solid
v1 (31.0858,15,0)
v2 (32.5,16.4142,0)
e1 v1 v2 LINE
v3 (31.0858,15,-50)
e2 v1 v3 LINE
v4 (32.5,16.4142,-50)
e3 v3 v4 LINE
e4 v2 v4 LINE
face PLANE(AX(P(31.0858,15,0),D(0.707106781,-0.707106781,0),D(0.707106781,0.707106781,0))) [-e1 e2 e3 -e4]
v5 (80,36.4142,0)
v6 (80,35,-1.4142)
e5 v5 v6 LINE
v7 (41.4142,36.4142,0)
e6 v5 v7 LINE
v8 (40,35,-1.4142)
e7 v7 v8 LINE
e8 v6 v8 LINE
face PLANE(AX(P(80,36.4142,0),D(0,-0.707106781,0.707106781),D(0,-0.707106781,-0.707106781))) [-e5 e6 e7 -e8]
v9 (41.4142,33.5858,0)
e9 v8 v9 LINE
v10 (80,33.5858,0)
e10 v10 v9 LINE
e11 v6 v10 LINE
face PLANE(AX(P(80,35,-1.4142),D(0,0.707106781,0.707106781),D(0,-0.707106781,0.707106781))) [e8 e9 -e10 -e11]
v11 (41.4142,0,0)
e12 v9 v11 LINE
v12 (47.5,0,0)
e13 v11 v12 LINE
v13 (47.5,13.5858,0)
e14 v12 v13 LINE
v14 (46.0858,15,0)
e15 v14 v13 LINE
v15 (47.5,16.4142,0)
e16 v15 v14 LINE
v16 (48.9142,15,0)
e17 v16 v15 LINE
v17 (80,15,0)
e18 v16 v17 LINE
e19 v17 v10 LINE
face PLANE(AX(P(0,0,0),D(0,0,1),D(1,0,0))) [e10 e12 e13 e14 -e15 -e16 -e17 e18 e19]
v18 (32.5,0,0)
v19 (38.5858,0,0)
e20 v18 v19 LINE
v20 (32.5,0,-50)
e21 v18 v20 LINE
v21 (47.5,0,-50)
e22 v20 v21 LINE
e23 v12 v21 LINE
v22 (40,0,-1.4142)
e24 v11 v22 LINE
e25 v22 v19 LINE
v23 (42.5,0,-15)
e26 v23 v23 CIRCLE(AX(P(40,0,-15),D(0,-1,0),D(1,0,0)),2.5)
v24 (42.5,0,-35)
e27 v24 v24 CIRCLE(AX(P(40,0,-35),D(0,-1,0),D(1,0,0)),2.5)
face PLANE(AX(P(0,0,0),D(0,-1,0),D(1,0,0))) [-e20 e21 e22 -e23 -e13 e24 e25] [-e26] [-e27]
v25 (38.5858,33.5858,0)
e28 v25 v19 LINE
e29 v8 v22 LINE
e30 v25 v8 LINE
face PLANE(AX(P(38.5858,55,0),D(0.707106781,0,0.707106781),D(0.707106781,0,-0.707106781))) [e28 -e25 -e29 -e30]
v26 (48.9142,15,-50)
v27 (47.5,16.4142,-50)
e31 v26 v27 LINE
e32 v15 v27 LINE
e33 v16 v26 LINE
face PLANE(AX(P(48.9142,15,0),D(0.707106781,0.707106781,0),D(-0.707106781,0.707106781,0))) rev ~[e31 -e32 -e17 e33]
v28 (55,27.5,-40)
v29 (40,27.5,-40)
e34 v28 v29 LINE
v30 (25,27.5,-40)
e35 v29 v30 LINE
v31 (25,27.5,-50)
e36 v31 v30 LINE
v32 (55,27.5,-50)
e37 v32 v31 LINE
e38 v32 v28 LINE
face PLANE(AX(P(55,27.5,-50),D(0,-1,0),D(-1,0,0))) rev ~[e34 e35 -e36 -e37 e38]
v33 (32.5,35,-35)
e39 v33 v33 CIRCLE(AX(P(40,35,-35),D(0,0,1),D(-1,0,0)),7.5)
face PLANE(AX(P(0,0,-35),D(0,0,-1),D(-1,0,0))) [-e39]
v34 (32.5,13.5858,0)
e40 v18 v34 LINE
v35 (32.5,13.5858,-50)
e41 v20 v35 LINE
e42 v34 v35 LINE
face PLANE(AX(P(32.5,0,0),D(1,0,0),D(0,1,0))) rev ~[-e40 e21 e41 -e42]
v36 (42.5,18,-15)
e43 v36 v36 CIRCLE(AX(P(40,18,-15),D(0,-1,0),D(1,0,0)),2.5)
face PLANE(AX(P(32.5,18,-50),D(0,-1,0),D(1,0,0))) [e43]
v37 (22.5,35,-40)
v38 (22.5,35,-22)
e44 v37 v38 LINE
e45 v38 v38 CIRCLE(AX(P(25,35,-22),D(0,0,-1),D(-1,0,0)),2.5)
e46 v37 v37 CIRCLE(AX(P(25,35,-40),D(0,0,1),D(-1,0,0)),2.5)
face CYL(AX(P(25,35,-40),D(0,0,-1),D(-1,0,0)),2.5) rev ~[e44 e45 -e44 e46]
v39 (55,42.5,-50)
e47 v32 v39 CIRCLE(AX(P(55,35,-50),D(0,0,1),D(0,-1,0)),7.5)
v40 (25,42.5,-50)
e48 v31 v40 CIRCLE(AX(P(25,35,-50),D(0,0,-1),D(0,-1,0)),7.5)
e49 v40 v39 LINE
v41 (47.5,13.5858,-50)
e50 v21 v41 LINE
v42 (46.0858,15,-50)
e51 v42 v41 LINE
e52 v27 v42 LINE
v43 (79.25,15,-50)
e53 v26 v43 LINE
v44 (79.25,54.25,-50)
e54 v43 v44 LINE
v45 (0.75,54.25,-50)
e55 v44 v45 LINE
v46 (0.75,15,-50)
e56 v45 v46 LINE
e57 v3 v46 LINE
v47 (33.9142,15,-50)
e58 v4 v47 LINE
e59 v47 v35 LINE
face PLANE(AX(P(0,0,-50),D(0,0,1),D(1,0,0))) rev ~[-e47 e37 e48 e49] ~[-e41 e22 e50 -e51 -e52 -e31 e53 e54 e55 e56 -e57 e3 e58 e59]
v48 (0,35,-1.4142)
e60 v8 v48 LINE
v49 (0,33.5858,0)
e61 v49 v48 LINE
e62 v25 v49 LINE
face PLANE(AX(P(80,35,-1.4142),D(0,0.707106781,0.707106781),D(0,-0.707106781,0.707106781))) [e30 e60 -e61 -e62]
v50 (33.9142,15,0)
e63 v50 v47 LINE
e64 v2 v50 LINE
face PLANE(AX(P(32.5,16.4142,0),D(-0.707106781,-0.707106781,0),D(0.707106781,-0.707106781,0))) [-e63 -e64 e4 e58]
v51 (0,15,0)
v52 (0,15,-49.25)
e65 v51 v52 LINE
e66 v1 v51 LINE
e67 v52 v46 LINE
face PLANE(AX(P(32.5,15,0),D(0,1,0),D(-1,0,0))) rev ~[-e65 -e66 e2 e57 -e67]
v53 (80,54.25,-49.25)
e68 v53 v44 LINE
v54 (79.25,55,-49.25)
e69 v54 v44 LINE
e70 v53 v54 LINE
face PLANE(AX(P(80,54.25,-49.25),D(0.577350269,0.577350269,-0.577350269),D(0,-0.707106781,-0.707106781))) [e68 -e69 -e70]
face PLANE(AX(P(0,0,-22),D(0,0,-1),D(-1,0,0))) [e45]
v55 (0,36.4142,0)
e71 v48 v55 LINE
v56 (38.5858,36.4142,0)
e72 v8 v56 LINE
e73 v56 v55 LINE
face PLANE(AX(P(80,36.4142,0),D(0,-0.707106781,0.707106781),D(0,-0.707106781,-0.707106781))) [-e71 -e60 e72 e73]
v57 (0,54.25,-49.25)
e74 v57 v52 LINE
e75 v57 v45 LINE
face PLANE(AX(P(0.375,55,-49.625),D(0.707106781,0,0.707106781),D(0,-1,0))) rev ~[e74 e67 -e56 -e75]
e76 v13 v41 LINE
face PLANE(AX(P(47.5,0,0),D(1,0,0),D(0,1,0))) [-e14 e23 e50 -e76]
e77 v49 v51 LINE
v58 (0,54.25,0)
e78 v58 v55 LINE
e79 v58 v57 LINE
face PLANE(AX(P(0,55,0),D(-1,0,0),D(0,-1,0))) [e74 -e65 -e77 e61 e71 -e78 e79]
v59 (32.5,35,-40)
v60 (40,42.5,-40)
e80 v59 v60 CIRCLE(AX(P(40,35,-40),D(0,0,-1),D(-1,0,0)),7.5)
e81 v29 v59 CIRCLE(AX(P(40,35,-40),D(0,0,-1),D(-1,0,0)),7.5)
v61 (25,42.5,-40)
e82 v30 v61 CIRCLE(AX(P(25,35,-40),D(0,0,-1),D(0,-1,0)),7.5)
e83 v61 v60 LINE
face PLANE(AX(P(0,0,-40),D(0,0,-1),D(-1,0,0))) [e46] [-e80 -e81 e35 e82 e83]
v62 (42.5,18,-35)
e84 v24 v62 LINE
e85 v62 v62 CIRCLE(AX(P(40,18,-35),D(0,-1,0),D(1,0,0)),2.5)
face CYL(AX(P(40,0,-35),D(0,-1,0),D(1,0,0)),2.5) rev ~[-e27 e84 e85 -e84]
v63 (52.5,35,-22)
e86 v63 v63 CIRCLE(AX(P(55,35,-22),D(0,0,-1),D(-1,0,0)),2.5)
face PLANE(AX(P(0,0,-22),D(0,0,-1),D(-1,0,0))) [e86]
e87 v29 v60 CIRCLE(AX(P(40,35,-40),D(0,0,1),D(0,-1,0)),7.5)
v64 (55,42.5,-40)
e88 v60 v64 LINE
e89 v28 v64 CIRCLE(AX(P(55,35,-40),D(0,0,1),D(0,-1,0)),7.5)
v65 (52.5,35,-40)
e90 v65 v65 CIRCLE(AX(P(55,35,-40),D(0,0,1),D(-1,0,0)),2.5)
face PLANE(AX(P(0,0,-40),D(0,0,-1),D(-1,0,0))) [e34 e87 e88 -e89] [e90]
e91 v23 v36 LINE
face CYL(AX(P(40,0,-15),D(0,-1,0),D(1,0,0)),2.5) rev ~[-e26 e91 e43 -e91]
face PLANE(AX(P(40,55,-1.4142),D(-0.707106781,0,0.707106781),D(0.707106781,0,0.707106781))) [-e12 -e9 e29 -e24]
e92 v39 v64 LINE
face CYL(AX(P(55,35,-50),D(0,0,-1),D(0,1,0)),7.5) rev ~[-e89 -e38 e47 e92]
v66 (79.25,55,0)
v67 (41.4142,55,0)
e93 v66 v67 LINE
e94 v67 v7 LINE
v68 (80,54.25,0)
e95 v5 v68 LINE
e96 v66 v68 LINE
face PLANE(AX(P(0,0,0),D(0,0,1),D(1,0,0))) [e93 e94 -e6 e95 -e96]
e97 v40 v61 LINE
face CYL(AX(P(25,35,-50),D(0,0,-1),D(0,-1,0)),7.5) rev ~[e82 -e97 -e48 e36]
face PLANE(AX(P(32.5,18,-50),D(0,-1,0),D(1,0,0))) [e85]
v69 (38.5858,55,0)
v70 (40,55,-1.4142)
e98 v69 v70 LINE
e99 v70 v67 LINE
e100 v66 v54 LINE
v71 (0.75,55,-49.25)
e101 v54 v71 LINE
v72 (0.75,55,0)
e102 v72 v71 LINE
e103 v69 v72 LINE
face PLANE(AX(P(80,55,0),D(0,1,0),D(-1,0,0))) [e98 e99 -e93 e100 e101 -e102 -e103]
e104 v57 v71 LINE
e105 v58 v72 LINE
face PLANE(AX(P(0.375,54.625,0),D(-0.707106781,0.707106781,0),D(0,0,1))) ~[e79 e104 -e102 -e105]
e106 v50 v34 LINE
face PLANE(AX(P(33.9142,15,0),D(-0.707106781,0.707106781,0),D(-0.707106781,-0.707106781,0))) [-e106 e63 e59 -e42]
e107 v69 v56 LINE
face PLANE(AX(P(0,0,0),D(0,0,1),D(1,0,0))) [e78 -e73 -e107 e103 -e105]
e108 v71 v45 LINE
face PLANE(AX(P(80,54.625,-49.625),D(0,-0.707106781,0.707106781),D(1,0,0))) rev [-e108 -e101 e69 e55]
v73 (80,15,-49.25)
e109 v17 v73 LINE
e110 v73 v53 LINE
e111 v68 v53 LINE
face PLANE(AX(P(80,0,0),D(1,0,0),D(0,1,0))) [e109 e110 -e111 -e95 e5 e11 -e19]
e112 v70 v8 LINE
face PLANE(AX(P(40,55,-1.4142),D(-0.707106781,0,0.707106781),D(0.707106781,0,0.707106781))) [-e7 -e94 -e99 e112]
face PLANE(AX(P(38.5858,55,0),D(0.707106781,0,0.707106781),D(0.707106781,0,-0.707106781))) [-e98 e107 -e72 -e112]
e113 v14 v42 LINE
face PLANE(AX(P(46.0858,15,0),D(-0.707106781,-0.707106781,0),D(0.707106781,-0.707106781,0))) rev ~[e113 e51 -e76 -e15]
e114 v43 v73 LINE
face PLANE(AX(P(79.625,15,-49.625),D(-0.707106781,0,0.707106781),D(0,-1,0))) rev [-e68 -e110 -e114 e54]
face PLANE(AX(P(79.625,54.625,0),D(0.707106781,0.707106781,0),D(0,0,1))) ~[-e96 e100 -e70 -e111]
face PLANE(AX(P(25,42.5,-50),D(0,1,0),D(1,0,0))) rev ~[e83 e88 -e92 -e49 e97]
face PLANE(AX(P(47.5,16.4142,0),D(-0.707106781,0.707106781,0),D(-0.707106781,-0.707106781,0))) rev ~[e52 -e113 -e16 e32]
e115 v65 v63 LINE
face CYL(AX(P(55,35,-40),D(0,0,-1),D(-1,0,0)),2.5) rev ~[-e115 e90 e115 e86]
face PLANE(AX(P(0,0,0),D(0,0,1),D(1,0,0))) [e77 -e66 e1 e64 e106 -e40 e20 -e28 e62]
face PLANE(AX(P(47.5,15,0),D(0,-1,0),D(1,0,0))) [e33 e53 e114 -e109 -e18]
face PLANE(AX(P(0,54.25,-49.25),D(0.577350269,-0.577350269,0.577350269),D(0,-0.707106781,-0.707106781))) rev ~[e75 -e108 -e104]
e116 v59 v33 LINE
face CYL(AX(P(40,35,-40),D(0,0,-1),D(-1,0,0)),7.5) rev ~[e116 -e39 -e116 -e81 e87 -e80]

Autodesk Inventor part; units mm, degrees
ref_plane "YZ Plane" through (0, 0, 0) normal (1, 0, 0) x (0, 1, 0)
ref_plane "XZ Plane" through (0, 0, 0) normal (0, 1, 0) x (-1, 0, 0)
ref_plane "XY Plane" through (0, 0, 0) normal (0, 0, 1) x (1, 0, 0)
sketch "Sketch1" plane through (0, 0, 0) normal (0, 0, 1) x (1, 0, 0)
  line L0 (0, 0) -> (80, 0)
  line L1 (80, 0) -> (80, 55)
  line L2 (80, 55) -> (0, 55)
  line L3 (0, 55) -> (0, 0)
  dimension "d0" = 55
  dimension "d1" = 80
extrude "Extrusion1" add sketch "Sketch1" against normal blind 50
sketch "Sketch2" plane through (0, 0, 0) normal (0, 0, 1) x (1, 0, 0)
  line L0 (0, 0) -> (32.5, 0)
  line L1 (32.5, 0) -> (32.5, 15)
  line L2 (32.5, 15) -> (0, 15)
  line L3 (0, 15) -> (0, 0)
  line L4 (80, 55) -> (80, 0) projected
  line L5 (80, 0) -> (47.5, 0)
  line L6 (47.5, 0) -> (47.5, 15)
  line L7 (47.5, 15) -> (80, 15)
  line L8 (80, 15) -> (80, 0)
  dimension "d4" = 15
  dimension "d5" = 15
extrude "Extrusion2" cut sketch "Sketch2" against normal through all
sketch "Sketch3" plane through (0, 0, 0) normal (0, 0, 1) x (1, 0, 0)
  line L0 (32.5, 13.5858) -> (31.0858, 15)
  line L1 (31.0858, 15) -> (32.5, 16.4142)
  line L2 (32.5, 16.4142) -> (33.9142, 15)
  line L3 (33.9142, 15) -> (32.5, 13.5858)
  line L4 (32.5, 15) -> (32.5, 0) projected
  line L5 (32.5, 13.5858) -> (32.5, 16.4142) construction
  line L6 (31.0858, 15) -> (33.9142, 15) construction
  line L7 (47.5, 13.5858) -> (48.9142, 15)
  line L8 (48.9142, 15) -> (47.5, 16.4142)
  line L9 (47.5, 16.4142) -> (46.0858, 15)
  line L10 (46.0858, 15) -> (47.5, 13.5858)
  line L11 (47.5, 15) -> (80, 15) projected
  line L12 (47.5, 13.5858) -> (47.5, 16.4142) construction
  line L13 (48.9142, 15) -> (46.0858, 15) construction
  point P0 (0, 0)
  dimension "d8" = 2
extrude "Extrusion3" cut sketch "Sketch3" against normal through all
sketch "Sketch4" plane through (80, 55, 0) normal (1, 0, 0) x (0, 0, -1)
  line L0 (-1.4142, -20) -> (0, -18.5858)
  line L1 (0, -18.5858) -> (1.4142, -20)
  line L2 (1.4142, -20) -> (0, -21.4142)
  line L3 (0, -21.4142) -> (-1.4142, -20)
  line L4 (0, -40) -> (0, 0) projected
  line L5 (-1.4142, -20) -> (1.4142, -20) construction
  line L6 (0, -18.5858) -> (0, -21.4142) construction
  line L7 (0, 0) -> (50, 0) projected
  point P0 (0, -55)
  point P1 (0, -20)
  dimension "d11" = 2
  dimension "d12" = 20
extrude "Extrusion4" cut sketch "Sketch4" against normal through all
sketch "Sketch5" plane through (0, 55, 0) normal (0, 1, 0) x (1, 0, 0)
  line L0 (40, -1.4142) -> (38.5858, 0)
  line L1 (38.5858, 0) -> (40, 1.4142)
  line L2 (40, 1.4142) -> (41.4142, 0)
  line L3 (41.4142, 0) -> (40, -1.4142)
  line L4 (32.5, 0) -> (47.5, 0) projected
  line L5 (40, -1.4142) -> (40, 1.4142) construction
  line L6 (38.5858, 0) -> (41.4142, 0) construction
  point P0 (0, 0)
  point P1 (40, 0)
  dimension "d15" = 2
extrude "Extrusion5" cut sketch "Sketch5" against normal through all
sketch "Sketch6" plane through (0, 0, -50) normal (0, 0, -1) x (-1, 0, 0)
  line L0 (-55, 35) -> (-25, 35) construction
  line L1 (-41.4142, 36.4142) -> (-80, 36.4142) projected
  line L2 (-55, 27.5) -> (-25, 27.5)
  line L3 (-25, 42.5) -> (-55, 42.5)
  arc A0 (-55, 42.5) -> (-55, 27.5) centre (-55, 35) ccw
  arc A1 (-25, 27.5) -> (-25, 42.5) centre (-25, 35) ccw
  line L4 (0, 55) -> (-80, 55) projected
  line L5 (-80, 55) -> (-80, 15) projected
  point P0 (0, 0)
  point P1 (-40, 35)
  dimension "d18" = 7.5
  dimension "d19" = 20
  dimension "d20" = 40
  dimension "d21" = 30
extrude "Extrusion6" cut sketch "Sketch6" against normal blind 10
sketch "Sketch7" plane through (0, 0, -40) normal (0, 0, -1) x (-1, 0, 0)
  line L0 (-80, 35) -> (-40, 35) projected
  circle A0 centre (-40, 35) radius 7.5
  point P0 (0, 0)
  dimension "d24" = 15
extrude "Extrusion7" cut sketch "Sketch7" against normal blind 5
sketch "Sketch8" plane through (0, 0, -40) normal (0, 0, -1) x (-1, 0, 0)
  line L0 (-80, 35) -> (-40, 35) projected
  circle A0 centre (-55, 35) radius 2.5
  line L1 (-40, 35) -> (0, 35) projected
  circle A1 centre (-25, 35) radius 2.5
  point P0 (0, 0)
  dimension "d27" = 5
  dimension "d28" = 15
  dimension "d29" = 15
extrude "Extrusion8" cut sketch "Sketch8" against normal blind 18
thread "Thread1" size "M6x1" class "6H" standard "ANSI Metric M Profile" length 15
thread "Thread2" size "M5x0.8" class "6H" standard "ANSI Metric M Profile" length 15
chamfer "Chamfer1" distance 0.75 angle 45 5 edges at (40, 55, -50) (80, 55, -25) (0, 55, -25) (0, 35, -50) (80, 35, -50)
sketch "Sketch9" plane through (32.5, 0, -50) normal (0, -1, 0) x (1, 0, 0)
  circle A0 centre (7.5, 35) radius 2.5
  circle A1 centre (7.5, 15) radius 2.5
  line L0 (15, 0) -> (0, 0) projected
  point P0 (-32.5, 50)
  point P1 (7.5, 48.5858)
  dimension "d39" = 5
  dimension "d40" = 20
  dimension "d41" = 15
extrude "Extrusion9" cut sketch "Sketch9" against normal blind 18
thread "Thread3" size "M6x1" class "6H" standard "ANSI Metric M Profile" length 15
thread "Thread4" size "M6x1" class "6H" standard "ANSI Metric M Profile" length 15
